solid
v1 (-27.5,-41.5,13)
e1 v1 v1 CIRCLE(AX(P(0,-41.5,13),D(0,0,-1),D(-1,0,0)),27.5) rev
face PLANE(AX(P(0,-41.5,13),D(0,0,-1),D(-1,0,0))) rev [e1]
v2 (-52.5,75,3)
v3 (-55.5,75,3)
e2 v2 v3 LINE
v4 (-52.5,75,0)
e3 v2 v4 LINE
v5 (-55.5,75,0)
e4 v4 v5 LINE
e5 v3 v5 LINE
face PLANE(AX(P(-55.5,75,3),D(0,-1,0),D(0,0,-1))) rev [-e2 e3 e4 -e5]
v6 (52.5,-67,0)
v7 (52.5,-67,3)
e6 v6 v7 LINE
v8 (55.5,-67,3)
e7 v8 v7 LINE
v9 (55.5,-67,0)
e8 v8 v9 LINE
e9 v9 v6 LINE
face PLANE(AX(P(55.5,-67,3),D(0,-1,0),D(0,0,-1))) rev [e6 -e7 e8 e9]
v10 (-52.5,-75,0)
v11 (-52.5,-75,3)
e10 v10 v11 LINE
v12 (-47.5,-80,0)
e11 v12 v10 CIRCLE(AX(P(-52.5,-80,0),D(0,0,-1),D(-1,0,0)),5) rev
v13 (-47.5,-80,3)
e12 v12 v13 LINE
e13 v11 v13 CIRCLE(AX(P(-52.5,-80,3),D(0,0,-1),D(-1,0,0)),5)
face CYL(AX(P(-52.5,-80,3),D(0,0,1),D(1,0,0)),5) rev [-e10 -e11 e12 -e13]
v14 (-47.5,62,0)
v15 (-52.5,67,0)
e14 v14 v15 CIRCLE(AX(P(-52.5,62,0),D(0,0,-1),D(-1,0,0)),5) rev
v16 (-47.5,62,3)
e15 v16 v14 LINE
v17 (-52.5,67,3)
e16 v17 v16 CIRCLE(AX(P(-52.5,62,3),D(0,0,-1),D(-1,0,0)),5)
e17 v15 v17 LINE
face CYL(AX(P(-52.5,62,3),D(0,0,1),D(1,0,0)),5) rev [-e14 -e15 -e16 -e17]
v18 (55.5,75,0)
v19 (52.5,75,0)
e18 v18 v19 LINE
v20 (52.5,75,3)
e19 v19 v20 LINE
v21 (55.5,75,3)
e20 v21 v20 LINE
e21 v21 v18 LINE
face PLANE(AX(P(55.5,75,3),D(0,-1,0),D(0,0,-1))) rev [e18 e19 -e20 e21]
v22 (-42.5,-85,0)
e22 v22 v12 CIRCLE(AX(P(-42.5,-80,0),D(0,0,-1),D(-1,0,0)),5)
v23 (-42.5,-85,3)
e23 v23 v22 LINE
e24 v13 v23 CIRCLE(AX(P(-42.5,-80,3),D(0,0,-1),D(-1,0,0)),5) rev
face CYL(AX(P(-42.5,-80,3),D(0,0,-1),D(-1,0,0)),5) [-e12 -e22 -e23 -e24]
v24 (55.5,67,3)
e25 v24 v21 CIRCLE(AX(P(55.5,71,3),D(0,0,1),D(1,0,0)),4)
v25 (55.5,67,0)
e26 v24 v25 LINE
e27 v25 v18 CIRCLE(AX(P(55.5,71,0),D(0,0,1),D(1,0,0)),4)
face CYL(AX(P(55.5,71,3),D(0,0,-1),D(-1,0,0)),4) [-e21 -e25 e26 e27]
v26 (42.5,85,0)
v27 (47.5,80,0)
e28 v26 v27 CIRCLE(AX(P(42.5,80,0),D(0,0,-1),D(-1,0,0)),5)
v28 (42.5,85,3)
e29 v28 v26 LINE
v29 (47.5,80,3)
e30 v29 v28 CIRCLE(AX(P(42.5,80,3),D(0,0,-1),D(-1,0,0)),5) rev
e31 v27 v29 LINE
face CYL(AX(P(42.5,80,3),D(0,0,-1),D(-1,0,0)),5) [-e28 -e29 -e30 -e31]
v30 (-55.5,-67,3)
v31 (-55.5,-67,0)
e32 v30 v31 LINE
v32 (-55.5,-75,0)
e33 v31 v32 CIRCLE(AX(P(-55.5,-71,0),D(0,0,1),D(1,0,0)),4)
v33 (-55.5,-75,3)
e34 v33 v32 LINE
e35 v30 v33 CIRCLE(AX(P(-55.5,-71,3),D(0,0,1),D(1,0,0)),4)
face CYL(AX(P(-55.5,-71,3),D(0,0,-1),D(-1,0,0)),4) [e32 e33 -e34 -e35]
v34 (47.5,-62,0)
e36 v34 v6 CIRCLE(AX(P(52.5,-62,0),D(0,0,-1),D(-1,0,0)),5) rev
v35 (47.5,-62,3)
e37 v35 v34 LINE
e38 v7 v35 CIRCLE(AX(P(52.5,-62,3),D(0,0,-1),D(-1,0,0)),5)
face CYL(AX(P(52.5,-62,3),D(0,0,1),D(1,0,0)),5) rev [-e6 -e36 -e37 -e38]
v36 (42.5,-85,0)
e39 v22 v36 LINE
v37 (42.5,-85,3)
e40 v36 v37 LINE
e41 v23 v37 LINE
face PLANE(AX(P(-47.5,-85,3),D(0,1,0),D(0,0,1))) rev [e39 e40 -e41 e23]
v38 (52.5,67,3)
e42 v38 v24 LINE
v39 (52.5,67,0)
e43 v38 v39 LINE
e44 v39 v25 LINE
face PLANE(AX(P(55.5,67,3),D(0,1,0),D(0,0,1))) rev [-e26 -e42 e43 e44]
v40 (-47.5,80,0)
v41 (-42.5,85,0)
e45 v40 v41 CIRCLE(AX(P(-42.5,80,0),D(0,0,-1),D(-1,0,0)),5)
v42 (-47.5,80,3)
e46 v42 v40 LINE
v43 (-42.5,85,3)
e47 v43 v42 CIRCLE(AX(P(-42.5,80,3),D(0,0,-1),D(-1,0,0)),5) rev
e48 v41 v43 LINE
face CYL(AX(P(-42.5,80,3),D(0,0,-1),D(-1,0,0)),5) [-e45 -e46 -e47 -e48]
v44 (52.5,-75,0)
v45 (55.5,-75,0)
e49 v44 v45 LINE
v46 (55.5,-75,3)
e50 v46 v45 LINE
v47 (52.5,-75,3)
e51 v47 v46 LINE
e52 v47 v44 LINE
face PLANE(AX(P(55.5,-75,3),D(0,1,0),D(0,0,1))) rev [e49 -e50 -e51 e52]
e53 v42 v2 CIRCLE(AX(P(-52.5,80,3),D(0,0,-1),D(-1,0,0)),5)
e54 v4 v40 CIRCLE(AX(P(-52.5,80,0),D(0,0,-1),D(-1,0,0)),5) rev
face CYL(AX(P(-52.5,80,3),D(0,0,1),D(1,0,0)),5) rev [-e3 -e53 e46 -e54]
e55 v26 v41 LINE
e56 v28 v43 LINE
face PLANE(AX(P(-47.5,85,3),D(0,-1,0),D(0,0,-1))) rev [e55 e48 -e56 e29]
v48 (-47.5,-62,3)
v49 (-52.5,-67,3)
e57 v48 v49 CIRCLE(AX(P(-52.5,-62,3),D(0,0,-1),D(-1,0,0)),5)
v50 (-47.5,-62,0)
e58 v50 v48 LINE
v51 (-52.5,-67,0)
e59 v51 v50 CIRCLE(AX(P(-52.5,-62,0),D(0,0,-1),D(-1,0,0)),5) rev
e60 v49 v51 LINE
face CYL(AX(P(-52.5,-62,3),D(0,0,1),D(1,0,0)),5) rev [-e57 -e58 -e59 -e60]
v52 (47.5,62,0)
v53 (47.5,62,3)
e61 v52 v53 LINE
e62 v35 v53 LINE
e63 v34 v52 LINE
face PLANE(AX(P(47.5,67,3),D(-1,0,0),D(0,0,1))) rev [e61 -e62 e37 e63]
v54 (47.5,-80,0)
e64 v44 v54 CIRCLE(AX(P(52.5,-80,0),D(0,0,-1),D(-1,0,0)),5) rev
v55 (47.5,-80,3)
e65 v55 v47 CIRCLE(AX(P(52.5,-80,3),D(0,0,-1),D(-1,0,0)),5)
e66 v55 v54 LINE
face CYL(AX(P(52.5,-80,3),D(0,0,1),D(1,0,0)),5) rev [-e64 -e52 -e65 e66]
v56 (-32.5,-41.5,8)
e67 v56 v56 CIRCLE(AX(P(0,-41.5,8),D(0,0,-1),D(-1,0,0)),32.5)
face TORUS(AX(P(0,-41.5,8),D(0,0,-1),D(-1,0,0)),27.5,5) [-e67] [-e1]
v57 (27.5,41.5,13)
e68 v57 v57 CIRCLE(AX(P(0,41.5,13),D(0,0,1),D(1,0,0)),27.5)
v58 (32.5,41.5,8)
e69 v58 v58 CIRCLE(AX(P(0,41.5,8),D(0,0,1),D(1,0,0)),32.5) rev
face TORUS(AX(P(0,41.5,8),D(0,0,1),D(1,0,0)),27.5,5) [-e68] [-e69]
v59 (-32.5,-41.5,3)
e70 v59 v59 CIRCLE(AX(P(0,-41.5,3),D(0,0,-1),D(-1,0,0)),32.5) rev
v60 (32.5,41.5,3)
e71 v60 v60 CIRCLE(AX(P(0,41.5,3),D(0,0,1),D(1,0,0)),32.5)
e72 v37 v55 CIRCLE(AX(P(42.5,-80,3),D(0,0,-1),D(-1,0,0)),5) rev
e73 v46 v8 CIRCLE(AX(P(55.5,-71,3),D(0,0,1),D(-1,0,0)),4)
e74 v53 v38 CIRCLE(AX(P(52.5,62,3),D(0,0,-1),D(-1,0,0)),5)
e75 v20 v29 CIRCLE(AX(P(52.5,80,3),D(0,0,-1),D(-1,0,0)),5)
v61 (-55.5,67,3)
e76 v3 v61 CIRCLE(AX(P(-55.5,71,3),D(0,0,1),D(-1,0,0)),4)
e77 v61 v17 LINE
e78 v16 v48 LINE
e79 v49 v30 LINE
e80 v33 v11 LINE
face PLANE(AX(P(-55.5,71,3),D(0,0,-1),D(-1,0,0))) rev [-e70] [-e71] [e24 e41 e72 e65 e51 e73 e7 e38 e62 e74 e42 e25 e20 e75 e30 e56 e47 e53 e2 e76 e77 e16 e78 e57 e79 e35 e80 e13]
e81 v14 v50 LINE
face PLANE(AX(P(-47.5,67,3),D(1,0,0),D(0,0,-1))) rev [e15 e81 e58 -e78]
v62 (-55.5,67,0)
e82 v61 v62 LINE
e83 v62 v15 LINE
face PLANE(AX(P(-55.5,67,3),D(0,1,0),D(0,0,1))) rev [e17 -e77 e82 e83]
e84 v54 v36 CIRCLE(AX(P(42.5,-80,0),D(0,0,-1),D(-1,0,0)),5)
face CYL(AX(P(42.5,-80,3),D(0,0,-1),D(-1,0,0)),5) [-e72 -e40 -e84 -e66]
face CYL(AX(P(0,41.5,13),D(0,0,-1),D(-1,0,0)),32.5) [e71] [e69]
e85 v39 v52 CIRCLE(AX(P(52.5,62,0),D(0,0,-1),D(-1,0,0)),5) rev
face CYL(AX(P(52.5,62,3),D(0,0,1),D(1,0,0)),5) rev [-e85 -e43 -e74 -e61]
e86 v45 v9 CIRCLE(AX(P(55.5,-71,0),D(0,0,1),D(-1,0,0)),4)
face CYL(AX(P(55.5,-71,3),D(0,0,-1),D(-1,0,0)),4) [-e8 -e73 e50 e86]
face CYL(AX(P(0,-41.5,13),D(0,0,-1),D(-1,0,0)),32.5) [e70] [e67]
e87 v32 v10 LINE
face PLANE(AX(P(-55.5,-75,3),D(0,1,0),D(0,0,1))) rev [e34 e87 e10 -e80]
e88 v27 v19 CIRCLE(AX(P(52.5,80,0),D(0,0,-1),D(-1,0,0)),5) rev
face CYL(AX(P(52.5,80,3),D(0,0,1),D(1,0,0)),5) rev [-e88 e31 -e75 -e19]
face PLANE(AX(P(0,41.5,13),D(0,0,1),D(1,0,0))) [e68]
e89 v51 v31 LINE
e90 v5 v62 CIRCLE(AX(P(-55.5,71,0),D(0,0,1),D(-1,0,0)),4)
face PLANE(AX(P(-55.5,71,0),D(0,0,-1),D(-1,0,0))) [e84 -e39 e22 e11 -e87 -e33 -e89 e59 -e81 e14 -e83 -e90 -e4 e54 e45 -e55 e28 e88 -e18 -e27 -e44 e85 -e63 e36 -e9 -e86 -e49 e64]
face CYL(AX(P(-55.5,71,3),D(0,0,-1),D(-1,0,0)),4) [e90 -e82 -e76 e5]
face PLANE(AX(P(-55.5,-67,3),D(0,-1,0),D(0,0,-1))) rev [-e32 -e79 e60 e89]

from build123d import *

# Parameters (mm, degrees)
EXTRUDE_1_DEPTH = 3
FILLET_1_R      = 5
SKETCH_2_R      = 32.5
EXTRUDE_2_DEPTH = 10
FILLET_2_R      = 5


with BuildPart() as part:
    # 草圖1 → 填料-伸長1 (new body)
    with BuildSketch(Plane.XY):
        with BuildLine():
            Line((-47.5, 67), (-47.5, -67))
            Line((-47.5, -67), (-55.5, -67))
            ThreePointArc((-55.5, -67), (-59.5, -71), (-55.5, -75))
            Line((-55.5, -75), (-47.5, -75))
            Line((-47.5, -75), (-47.5, -85))
            Line((-47.5, -85), (47.5, -85))
            Line((47.5, -85), (47.5, -75))
            Line((47.5, -75), (55.5, -75))
            ThreePointArc((55.5, -75), (59.5, -71), (55.5, -67))
            Line((55.5, -67), (47.5, -67))
            Line((47.5, -67), (47.5, 67))
            Line((47.5, 67), (55.5, 67))
            ThreePointArc((55.5, 67), (59.5, 71), (55.5, 75))
            Line((55.5, 75), (47.5, 75))
            Line((47.5, 75), (47.5, 85))
            Line((47.5, 85), (-47.5, 85))
            Line((-47.5, 85), (-47.5, 75))
            Line((-47.5, 75), (-55.5, 75))
            ThreePointArc((-55.5, 75), (-59.5, 71), (-55.5, 67))
            Line((-55.5, 67), (-47.5, 67))
        make_face()
    extrude(amount=EXTRUDE_1_DEPTH)

    # 圓角1
    fillet_1_edges = [part.edges().sort_by_distance(p)[0] for p in [
        (-47.5, 85, 1.5),
        (47.5, 85, 1.5),
        (47.5, 75, 1.5),
        (47.5, 67, 1.5),
        (47.5, -67, 1.5),
        (47.5, -75, 1.5),
        (47.5, -85, 1.5),
        (-47.5, -85, 1.5),
        (-47.5, -75, 1.5),
        (-47.5, -67, 1.5),
        (-47.5, 67, 1.5),
        (-47.5, 75, 1.5),
    ]]
    fillet(fillet_1_edges, radius=FILLET_1_R - 0.0001)  # a hair under: the kernel refuses the full size

    # 草圖2 → 填料-伸長2 (add)
    with BuildSketch(Plane.XY.offset(3)):
        with Locations((0, 41.5)):
            Circle(SKETCH_2_R)
        with Locations(Location((0, -41.5, 0), (0, 0, 180))):
            Circle(SKETCH_2_R)
    extrude(amount=EXTRUDE_2_DEPTH)

    # 圓角2
    fillet_2_edges = [part.edges().sort_by_distance(p)[0] for p in [
        (-32.5, 41.5, 13),
        (32.5, -41.5, 13),
    ]]
    fillet(fillet_2_edges, radius=FILLET_2_R)


solid = part.part
